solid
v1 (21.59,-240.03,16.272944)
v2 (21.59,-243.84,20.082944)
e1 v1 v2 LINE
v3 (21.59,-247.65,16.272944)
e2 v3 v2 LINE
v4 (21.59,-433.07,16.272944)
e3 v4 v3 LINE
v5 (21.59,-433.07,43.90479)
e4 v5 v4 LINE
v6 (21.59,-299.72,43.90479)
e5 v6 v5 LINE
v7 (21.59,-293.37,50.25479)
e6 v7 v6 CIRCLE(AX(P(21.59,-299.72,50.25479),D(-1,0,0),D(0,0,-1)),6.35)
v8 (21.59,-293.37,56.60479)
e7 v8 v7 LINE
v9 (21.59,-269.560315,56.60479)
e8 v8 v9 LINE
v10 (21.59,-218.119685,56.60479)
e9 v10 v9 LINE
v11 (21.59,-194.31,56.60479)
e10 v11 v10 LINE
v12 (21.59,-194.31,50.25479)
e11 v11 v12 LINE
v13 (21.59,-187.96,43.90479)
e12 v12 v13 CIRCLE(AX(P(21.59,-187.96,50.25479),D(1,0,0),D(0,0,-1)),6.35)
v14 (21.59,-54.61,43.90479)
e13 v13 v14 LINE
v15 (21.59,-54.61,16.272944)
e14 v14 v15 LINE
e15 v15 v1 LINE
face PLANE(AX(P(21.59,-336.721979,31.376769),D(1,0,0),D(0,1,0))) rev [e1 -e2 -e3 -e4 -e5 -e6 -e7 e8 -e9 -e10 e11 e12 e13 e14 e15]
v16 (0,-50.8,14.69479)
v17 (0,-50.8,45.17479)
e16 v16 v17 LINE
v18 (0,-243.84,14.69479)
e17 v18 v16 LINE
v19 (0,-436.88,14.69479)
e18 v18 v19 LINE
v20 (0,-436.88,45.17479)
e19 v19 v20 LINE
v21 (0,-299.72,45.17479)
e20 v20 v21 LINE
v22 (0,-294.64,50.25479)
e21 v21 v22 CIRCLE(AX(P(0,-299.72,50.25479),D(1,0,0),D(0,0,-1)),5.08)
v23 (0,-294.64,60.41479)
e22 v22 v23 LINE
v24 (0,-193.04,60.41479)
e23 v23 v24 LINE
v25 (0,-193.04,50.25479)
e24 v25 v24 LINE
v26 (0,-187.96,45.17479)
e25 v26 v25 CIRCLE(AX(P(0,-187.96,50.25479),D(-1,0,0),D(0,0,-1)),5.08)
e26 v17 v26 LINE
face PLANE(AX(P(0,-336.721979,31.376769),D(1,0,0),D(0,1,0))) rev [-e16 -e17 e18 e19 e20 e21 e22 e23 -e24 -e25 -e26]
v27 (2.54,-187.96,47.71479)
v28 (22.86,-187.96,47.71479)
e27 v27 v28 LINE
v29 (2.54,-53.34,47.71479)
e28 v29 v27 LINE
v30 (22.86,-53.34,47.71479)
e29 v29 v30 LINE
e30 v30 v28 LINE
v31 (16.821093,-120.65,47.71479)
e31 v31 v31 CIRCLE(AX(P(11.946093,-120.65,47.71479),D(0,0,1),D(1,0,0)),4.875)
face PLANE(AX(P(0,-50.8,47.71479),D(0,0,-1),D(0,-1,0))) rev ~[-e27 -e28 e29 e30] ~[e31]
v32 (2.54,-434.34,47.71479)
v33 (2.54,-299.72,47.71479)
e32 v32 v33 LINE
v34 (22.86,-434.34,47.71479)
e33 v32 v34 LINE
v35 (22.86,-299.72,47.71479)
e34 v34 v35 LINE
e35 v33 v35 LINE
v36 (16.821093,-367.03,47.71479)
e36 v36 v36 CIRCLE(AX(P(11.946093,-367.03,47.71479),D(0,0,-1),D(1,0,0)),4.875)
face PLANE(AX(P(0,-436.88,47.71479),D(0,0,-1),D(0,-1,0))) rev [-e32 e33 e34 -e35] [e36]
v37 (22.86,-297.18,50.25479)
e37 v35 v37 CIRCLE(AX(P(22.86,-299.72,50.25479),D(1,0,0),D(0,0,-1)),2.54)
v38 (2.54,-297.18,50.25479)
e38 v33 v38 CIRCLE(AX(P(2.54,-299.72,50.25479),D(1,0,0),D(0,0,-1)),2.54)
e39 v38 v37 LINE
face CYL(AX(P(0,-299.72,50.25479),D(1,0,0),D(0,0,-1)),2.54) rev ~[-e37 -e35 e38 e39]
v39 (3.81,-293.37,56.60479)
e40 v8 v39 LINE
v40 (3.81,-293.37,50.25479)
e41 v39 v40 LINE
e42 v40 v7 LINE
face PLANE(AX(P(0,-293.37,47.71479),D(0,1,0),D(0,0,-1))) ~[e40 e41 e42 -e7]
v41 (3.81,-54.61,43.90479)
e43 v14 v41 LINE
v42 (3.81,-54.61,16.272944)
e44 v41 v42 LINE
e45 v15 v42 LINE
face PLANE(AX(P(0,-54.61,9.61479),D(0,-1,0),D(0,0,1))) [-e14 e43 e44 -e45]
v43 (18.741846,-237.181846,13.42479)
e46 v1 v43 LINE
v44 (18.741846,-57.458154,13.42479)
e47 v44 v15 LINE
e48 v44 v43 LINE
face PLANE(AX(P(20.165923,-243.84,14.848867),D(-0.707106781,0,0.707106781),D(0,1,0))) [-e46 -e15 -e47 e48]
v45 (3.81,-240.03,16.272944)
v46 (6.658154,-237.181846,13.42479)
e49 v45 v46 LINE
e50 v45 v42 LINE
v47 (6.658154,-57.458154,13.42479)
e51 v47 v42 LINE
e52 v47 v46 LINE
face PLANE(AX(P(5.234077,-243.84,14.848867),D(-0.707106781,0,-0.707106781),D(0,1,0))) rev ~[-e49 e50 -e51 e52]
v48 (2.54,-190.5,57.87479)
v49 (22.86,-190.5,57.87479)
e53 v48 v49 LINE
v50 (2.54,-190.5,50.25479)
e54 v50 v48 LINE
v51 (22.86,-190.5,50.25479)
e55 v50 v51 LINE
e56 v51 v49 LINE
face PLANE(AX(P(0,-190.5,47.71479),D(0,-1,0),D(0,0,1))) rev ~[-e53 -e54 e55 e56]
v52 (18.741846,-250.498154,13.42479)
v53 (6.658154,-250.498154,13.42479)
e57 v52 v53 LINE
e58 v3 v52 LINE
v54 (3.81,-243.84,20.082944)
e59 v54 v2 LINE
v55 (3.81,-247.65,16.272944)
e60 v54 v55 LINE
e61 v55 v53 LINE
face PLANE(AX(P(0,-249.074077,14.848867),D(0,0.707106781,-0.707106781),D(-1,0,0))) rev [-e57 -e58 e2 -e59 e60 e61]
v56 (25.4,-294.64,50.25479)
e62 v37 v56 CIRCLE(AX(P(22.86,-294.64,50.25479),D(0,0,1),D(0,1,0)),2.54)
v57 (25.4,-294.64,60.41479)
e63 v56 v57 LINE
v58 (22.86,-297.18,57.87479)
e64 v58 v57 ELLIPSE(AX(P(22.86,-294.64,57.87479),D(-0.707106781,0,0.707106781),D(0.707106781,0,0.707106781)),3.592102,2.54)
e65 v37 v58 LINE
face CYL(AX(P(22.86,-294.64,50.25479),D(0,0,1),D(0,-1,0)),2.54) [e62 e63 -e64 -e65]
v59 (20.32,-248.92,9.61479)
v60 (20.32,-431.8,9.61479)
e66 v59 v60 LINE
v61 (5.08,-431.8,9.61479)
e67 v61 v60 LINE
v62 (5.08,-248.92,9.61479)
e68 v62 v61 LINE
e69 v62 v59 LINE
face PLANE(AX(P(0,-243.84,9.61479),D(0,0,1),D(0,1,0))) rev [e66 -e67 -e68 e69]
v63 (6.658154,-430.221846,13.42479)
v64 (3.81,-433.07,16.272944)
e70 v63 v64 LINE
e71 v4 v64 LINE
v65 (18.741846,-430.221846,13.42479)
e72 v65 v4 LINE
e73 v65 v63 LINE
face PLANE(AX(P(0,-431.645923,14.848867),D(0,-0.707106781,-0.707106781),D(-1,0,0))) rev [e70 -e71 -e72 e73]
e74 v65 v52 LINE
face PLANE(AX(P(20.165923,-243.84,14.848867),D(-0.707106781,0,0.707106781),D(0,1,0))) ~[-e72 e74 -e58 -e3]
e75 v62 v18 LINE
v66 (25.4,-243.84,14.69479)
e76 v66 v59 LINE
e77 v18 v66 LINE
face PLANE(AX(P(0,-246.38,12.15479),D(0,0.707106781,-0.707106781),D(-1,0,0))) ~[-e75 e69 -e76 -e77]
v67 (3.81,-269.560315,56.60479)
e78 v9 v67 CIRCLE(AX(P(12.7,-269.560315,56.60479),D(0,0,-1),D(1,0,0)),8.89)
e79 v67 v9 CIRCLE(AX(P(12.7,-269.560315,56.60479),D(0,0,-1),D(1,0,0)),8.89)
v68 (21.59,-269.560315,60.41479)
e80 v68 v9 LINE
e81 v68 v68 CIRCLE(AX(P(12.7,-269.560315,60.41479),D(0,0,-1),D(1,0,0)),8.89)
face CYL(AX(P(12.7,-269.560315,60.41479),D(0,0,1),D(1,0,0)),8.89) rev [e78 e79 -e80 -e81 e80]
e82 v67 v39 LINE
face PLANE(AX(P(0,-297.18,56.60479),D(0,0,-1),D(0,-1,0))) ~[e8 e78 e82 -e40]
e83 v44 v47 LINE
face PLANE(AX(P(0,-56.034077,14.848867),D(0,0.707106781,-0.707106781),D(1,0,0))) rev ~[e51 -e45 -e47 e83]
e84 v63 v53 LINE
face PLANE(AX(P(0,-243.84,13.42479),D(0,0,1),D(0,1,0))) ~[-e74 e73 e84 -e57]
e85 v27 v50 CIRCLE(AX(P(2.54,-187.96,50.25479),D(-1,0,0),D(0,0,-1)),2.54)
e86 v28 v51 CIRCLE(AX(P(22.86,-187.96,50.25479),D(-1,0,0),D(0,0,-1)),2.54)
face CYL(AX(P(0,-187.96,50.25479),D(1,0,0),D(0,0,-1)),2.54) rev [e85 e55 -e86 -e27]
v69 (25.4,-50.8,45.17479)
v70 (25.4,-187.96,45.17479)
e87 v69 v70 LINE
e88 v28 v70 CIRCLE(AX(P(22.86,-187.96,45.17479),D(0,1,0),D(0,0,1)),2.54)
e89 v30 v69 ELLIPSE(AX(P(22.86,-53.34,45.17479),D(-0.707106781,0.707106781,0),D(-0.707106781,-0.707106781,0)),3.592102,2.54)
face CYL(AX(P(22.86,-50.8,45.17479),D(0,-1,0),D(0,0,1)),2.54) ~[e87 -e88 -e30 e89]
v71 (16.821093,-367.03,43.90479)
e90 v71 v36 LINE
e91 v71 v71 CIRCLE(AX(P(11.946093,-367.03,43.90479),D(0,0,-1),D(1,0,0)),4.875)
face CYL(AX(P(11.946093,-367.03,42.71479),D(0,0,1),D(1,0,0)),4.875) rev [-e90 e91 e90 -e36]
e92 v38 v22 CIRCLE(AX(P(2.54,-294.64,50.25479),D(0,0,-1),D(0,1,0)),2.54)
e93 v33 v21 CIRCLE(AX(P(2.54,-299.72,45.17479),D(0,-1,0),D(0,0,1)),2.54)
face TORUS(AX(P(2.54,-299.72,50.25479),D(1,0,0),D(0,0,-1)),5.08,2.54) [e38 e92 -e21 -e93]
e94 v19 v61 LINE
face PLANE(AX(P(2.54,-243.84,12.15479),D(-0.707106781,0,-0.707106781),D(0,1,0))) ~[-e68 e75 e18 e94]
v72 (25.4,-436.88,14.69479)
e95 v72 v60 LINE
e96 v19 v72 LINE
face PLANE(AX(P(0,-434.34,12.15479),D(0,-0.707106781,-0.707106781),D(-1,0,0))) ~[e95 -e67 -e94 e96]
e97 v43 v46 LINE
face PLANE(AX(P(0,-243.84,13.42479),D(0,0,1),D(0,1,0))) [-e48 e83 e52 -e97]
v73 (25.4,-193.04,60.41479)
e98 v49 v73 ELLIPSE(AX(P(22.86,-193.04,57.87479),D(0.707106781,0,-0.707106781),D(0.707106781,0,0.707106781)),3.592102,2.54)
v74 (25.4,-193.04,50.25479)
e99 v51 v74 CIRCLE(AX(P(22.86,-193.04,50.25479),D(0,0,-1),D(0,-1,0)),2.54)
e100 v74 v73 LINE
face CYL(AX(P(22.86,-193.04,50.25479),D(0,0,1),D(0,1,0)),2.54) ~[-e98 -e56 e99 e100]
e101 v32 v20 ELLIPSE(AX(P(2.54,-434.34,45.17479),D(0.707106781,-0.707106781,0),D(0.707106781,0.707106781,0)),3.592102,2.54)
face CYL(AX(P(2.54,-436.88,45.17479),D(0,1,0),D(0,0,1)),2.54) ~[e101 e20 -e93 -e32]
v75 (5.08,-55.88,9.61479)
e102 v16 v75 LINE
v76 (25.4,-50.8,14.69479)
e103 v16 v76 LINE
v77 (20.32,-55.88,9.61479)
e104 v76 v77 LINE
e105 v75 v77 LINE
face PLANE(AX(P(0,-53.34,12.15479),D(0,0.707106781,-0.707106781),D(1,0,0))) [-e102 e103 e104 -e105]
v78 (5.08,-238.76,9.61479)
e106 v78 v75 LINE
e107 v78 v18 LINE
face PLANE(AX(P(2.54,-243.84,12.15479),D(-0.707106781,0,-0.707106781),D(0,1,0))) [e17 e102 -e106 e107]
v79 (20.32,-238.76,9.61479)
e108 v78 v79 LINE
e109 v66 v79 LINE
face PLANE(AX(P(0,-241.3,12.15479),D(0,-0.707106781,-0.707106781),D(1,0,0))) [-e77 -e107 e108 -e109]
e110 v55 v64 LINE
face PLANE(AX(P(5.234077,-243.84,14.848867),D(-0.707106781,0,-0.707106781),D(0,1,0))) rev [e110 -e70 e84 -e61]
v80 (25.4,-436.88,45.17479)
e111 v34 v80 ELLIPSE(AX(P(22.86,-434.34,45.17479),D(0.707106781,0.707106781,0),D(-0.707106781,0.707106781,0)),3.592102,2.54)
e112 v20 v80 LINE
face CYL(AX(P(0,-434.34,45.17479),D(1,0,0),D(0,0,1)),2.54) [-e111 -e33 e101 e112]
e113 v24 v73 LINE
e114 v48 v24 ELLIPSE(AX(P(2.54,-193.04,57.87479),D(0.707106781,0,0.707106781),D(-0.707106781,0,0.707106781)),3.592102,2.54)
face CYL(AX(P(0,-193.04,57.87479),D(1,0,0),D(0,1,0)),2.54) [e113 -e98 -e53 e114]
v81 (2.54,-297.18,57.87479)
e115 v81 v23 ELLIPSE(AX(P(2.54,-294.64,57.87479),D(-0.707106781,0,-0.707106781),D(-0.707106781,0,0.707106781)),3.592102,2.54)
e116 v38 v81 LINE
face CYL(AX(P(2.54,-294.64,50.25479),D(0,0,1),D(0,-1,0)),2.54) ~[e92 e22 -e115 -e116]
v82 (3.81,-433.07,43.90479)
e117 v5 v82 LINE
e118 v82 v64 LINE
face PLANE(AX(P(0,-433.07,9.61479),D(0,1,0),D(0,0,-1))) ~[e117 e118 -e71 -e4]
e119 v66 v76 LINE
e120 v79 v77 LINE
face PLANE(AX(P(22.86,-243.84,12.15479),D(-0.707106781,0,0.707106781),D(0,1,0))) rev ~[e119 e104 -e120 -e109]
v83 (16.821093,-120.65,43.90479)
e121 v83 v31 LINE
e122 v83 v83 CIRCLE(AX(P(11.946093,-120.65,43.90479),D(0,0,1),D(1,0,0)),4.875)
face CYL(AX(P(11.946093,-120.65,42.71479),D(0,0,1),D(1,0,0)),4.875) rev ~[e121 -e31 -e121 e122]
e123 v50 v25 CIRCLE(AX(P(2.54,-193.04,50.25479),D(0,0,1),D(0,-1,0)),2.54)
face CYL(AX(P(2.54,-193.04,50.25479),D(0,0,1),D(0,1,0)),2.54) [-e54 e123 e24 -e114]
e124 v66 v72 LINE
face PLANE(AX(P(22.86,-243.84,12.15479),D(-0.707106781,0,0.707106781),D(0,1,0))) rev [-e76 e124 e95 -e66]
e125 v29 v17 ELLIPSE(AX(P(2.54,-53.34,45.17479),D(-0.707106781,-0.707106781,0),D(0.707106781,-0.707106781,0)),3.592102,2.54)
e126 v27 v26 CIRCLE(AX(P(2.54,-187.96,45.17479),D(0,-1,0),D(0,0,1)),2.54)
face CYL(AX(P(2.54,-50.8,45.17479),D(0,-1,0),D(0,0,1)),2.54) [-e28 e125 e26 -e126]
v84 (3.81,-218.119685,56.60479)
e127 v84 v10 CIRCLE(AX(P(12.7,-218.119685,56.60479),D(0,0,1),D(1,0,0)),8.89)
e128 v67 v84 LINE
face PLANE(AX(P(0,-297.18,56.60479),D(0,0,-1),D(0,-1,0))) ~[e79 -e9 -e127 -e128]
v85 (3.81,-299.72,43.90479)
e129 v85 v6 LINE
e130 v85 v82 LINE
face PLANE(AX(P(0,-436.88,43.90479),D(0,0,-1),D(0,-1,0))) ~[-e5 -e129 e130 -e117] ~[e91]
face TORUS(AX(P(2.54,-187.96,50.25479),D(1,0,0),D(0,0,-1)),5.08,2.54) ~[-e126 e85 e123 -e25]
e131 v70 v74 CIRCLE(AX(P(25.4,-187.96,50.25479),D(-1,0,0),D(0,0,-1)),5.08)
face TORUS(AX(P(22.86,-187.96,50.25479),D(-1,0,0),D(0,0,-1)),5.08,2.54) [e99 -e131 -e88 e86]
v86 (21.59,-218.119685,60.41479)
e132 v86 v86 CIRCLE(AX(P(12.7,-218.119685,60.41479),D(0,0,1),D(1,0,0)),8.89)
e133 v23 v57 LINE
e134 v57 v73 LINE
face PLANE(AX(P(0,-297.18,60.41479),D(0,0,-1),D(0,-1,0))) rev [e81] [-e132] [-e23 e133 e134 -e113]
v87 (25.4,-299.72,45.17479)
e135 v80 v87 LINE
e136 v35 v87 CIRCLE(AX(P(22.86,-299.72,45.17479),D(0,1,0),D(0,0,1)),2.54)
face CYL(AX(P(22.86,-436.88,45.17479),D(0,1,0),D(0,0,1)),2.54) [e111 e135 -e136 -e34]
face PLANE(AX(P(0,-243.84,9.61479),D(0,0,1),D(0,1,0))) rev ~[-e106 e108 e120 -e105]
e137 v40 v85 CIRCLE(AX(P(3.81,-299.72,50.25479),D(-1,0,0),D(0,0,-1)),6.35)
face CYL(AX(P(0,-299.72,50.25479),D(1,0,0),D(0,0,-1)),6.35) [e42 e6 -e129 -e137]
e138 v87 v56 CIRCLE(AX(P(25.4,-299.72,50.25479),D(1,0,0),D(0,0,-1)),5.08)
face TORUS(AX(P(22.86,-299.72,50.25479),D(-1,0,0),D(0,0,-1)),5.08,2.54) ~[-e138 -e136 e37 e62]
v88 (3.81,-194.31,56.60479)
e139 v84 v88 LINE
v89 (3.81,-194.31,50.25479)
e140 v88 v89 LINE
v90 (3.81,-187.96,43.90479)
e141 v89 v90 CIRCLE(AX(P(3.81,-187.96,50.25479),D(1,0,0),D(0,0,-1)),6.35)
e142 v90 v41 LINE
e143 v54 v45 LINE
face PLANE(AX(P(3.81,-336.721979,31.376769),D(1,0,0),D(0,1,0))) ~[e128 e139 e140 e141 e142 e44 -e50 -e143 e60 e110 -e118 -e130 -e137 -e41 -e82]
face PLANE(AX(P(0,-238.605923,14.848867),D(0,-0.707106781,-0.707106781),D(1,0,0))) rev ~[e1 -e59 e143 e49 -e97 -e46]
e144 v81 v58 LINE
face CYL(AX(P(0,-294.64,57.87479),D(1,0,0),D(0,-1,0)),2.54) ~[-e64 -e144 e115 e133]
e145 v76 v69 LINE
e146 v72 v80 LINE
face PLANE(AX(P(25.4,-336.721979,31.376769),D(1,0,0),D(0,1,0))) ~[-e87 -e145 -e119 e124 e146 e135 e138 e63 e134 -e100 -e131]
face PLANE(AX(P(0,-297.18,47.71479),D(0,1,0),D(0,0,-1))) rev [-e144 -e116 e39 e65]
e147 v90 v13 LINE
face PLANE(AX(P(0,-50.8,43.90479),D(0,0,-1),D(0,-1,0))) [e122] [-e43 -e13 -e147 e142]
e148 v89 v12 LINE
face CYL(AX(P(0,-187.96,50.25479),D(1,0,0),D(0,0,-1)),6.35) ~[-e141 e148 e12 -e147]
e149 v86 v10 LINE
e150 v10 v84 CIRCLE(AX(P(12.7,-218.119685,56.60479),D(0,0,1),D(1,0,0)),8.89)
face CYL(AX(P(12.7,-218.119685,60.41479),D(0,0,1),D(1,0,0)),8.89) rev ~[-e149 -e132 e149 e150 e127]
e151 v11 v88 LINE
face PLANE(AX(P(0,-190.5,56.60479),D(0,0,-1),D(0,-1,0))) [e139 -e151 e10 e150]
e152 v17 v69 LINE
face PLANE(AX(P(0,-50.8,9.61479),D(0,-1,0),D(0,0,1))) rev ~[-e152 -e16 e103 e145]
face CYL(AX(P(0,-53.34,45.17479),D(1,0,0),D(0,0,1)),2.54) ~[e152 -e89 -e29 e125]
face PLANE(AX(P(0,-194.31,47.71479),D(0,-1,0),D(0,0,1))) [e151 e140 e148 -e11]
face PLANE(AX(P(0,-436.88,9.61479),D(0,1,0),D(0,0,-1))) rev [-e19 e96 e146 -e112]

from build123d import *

# Parameters (mm, degrees)
F1_DEPTH       = 25.4
F2_F1_R        = 2.54
F2_F2_R        = 2.54
F3_SIZE        = 5.08
F4_T           = -3.81
F5_R           = 8.89
F6_DEPTH       = 3.81
F7_D           = 5.5
F7_DEPTH       = 12.7
F7_START       = 12.7
F7_CBORE_D     = 9.75
F7_CBORE_DEPTH = 5
F7_TIP         = 1.6523667023


with BuildPart() as f1:
    # F0 (on Right) → F1 (new body)
    with BuildSketch(Plane.YZ):
        Polygon((-190.5, 60.4147898585), (-243.84, 60.4147898585), (-243.84, 9.6147898585), (-50.8, 9.6147898585), (-50.8, 47.7147898585), (-190.5, 47.7147898585), align=None)
    extrude(amount=F1_DEPTH)

    # F2: fillet of radius 2.54 on 5 edges, made by hand

    # F2_f1
    f2_f1_edges = [f1.edges().sort_by_distance(p)[0] for p in [
        (12.7, -190.5, 47.7147898585),
    ]]
    fillet(f2_f1_edges, radius=F2_F1_R)

    # F2_f2
    f2_f2_edges = [f1.edges().sort_by_distance(p)[0] for p in [
        (25.4, -119.38, 47.7147898585),
        (0, -119.38, 47.7147898585),
        (12.7, -50.8, 47.7147898585),
        (12.7, -190.5, 60.4147898585),
        (0, -189.7560512242, 48.4587386342),
        (25.4, -189.7560512242, 48.4587386342),
    ]]
    fillet(f2_f2_edges, radius=F2_F2_R)

    # F3
    f3_edges = [f1.edges().sort_by_distance(p)[0] for p in [
        (25.4, -147.32, 9.61479),
        (12.7, -243.84, 9.61479),
        (12.7, -50.8, 9.61479),
        (0, -147.32, 9.61479),
    ]]
    chamfer(f3_edges, length=F3_SIZE)

    # F4
    f4_openings = [f1.faces().sort_by_distance(p)[0] for p in [
        (12.7, -243.84, 37.55479),
    ]]
    offset(amount=F4_T, openings=f4_openings)

    # F5 (on face) → F6 (cut, through all)
    with BuildSketch(Plane.XY.offset(60.4147898585)):
        with Locations((12.7, -218.1196852207)):
            Circle(F5_R)
    extrude(amount=-F6_DEPTH, mode=Mode.SUBTRACT)

    # F7
    # its depths count from where the whole tool has entered the part; down to there all is cleared
    with Locations(Plane.XY.offset(60.4147898585).offset(-F7_START)):
        with Locations((11.946093291, -120.65)):
            CounterBoreHole(F7_D / 2, F7_CBORE_D / 2, F7_CBORE_DEPTH, depth=F7_DEPTH)
            with Locations((0, 0, -(F7_DEPTH + F7_TIP / 2))):  # 118° drill point
                Cone(0, F7_D / 2, F7_TIP, mode=Mode.SUBTRACT)

    # F8: F1 across face


with BuildPart() as f1_1:
    add(f1.part)
    add(f1.part.mirror(Plane(origin=(12.7, -243.84, 36.5538832465), x_dir=(1, 0, 0), z_dir=(0, -1, 0))))


solid = f1_1.part
